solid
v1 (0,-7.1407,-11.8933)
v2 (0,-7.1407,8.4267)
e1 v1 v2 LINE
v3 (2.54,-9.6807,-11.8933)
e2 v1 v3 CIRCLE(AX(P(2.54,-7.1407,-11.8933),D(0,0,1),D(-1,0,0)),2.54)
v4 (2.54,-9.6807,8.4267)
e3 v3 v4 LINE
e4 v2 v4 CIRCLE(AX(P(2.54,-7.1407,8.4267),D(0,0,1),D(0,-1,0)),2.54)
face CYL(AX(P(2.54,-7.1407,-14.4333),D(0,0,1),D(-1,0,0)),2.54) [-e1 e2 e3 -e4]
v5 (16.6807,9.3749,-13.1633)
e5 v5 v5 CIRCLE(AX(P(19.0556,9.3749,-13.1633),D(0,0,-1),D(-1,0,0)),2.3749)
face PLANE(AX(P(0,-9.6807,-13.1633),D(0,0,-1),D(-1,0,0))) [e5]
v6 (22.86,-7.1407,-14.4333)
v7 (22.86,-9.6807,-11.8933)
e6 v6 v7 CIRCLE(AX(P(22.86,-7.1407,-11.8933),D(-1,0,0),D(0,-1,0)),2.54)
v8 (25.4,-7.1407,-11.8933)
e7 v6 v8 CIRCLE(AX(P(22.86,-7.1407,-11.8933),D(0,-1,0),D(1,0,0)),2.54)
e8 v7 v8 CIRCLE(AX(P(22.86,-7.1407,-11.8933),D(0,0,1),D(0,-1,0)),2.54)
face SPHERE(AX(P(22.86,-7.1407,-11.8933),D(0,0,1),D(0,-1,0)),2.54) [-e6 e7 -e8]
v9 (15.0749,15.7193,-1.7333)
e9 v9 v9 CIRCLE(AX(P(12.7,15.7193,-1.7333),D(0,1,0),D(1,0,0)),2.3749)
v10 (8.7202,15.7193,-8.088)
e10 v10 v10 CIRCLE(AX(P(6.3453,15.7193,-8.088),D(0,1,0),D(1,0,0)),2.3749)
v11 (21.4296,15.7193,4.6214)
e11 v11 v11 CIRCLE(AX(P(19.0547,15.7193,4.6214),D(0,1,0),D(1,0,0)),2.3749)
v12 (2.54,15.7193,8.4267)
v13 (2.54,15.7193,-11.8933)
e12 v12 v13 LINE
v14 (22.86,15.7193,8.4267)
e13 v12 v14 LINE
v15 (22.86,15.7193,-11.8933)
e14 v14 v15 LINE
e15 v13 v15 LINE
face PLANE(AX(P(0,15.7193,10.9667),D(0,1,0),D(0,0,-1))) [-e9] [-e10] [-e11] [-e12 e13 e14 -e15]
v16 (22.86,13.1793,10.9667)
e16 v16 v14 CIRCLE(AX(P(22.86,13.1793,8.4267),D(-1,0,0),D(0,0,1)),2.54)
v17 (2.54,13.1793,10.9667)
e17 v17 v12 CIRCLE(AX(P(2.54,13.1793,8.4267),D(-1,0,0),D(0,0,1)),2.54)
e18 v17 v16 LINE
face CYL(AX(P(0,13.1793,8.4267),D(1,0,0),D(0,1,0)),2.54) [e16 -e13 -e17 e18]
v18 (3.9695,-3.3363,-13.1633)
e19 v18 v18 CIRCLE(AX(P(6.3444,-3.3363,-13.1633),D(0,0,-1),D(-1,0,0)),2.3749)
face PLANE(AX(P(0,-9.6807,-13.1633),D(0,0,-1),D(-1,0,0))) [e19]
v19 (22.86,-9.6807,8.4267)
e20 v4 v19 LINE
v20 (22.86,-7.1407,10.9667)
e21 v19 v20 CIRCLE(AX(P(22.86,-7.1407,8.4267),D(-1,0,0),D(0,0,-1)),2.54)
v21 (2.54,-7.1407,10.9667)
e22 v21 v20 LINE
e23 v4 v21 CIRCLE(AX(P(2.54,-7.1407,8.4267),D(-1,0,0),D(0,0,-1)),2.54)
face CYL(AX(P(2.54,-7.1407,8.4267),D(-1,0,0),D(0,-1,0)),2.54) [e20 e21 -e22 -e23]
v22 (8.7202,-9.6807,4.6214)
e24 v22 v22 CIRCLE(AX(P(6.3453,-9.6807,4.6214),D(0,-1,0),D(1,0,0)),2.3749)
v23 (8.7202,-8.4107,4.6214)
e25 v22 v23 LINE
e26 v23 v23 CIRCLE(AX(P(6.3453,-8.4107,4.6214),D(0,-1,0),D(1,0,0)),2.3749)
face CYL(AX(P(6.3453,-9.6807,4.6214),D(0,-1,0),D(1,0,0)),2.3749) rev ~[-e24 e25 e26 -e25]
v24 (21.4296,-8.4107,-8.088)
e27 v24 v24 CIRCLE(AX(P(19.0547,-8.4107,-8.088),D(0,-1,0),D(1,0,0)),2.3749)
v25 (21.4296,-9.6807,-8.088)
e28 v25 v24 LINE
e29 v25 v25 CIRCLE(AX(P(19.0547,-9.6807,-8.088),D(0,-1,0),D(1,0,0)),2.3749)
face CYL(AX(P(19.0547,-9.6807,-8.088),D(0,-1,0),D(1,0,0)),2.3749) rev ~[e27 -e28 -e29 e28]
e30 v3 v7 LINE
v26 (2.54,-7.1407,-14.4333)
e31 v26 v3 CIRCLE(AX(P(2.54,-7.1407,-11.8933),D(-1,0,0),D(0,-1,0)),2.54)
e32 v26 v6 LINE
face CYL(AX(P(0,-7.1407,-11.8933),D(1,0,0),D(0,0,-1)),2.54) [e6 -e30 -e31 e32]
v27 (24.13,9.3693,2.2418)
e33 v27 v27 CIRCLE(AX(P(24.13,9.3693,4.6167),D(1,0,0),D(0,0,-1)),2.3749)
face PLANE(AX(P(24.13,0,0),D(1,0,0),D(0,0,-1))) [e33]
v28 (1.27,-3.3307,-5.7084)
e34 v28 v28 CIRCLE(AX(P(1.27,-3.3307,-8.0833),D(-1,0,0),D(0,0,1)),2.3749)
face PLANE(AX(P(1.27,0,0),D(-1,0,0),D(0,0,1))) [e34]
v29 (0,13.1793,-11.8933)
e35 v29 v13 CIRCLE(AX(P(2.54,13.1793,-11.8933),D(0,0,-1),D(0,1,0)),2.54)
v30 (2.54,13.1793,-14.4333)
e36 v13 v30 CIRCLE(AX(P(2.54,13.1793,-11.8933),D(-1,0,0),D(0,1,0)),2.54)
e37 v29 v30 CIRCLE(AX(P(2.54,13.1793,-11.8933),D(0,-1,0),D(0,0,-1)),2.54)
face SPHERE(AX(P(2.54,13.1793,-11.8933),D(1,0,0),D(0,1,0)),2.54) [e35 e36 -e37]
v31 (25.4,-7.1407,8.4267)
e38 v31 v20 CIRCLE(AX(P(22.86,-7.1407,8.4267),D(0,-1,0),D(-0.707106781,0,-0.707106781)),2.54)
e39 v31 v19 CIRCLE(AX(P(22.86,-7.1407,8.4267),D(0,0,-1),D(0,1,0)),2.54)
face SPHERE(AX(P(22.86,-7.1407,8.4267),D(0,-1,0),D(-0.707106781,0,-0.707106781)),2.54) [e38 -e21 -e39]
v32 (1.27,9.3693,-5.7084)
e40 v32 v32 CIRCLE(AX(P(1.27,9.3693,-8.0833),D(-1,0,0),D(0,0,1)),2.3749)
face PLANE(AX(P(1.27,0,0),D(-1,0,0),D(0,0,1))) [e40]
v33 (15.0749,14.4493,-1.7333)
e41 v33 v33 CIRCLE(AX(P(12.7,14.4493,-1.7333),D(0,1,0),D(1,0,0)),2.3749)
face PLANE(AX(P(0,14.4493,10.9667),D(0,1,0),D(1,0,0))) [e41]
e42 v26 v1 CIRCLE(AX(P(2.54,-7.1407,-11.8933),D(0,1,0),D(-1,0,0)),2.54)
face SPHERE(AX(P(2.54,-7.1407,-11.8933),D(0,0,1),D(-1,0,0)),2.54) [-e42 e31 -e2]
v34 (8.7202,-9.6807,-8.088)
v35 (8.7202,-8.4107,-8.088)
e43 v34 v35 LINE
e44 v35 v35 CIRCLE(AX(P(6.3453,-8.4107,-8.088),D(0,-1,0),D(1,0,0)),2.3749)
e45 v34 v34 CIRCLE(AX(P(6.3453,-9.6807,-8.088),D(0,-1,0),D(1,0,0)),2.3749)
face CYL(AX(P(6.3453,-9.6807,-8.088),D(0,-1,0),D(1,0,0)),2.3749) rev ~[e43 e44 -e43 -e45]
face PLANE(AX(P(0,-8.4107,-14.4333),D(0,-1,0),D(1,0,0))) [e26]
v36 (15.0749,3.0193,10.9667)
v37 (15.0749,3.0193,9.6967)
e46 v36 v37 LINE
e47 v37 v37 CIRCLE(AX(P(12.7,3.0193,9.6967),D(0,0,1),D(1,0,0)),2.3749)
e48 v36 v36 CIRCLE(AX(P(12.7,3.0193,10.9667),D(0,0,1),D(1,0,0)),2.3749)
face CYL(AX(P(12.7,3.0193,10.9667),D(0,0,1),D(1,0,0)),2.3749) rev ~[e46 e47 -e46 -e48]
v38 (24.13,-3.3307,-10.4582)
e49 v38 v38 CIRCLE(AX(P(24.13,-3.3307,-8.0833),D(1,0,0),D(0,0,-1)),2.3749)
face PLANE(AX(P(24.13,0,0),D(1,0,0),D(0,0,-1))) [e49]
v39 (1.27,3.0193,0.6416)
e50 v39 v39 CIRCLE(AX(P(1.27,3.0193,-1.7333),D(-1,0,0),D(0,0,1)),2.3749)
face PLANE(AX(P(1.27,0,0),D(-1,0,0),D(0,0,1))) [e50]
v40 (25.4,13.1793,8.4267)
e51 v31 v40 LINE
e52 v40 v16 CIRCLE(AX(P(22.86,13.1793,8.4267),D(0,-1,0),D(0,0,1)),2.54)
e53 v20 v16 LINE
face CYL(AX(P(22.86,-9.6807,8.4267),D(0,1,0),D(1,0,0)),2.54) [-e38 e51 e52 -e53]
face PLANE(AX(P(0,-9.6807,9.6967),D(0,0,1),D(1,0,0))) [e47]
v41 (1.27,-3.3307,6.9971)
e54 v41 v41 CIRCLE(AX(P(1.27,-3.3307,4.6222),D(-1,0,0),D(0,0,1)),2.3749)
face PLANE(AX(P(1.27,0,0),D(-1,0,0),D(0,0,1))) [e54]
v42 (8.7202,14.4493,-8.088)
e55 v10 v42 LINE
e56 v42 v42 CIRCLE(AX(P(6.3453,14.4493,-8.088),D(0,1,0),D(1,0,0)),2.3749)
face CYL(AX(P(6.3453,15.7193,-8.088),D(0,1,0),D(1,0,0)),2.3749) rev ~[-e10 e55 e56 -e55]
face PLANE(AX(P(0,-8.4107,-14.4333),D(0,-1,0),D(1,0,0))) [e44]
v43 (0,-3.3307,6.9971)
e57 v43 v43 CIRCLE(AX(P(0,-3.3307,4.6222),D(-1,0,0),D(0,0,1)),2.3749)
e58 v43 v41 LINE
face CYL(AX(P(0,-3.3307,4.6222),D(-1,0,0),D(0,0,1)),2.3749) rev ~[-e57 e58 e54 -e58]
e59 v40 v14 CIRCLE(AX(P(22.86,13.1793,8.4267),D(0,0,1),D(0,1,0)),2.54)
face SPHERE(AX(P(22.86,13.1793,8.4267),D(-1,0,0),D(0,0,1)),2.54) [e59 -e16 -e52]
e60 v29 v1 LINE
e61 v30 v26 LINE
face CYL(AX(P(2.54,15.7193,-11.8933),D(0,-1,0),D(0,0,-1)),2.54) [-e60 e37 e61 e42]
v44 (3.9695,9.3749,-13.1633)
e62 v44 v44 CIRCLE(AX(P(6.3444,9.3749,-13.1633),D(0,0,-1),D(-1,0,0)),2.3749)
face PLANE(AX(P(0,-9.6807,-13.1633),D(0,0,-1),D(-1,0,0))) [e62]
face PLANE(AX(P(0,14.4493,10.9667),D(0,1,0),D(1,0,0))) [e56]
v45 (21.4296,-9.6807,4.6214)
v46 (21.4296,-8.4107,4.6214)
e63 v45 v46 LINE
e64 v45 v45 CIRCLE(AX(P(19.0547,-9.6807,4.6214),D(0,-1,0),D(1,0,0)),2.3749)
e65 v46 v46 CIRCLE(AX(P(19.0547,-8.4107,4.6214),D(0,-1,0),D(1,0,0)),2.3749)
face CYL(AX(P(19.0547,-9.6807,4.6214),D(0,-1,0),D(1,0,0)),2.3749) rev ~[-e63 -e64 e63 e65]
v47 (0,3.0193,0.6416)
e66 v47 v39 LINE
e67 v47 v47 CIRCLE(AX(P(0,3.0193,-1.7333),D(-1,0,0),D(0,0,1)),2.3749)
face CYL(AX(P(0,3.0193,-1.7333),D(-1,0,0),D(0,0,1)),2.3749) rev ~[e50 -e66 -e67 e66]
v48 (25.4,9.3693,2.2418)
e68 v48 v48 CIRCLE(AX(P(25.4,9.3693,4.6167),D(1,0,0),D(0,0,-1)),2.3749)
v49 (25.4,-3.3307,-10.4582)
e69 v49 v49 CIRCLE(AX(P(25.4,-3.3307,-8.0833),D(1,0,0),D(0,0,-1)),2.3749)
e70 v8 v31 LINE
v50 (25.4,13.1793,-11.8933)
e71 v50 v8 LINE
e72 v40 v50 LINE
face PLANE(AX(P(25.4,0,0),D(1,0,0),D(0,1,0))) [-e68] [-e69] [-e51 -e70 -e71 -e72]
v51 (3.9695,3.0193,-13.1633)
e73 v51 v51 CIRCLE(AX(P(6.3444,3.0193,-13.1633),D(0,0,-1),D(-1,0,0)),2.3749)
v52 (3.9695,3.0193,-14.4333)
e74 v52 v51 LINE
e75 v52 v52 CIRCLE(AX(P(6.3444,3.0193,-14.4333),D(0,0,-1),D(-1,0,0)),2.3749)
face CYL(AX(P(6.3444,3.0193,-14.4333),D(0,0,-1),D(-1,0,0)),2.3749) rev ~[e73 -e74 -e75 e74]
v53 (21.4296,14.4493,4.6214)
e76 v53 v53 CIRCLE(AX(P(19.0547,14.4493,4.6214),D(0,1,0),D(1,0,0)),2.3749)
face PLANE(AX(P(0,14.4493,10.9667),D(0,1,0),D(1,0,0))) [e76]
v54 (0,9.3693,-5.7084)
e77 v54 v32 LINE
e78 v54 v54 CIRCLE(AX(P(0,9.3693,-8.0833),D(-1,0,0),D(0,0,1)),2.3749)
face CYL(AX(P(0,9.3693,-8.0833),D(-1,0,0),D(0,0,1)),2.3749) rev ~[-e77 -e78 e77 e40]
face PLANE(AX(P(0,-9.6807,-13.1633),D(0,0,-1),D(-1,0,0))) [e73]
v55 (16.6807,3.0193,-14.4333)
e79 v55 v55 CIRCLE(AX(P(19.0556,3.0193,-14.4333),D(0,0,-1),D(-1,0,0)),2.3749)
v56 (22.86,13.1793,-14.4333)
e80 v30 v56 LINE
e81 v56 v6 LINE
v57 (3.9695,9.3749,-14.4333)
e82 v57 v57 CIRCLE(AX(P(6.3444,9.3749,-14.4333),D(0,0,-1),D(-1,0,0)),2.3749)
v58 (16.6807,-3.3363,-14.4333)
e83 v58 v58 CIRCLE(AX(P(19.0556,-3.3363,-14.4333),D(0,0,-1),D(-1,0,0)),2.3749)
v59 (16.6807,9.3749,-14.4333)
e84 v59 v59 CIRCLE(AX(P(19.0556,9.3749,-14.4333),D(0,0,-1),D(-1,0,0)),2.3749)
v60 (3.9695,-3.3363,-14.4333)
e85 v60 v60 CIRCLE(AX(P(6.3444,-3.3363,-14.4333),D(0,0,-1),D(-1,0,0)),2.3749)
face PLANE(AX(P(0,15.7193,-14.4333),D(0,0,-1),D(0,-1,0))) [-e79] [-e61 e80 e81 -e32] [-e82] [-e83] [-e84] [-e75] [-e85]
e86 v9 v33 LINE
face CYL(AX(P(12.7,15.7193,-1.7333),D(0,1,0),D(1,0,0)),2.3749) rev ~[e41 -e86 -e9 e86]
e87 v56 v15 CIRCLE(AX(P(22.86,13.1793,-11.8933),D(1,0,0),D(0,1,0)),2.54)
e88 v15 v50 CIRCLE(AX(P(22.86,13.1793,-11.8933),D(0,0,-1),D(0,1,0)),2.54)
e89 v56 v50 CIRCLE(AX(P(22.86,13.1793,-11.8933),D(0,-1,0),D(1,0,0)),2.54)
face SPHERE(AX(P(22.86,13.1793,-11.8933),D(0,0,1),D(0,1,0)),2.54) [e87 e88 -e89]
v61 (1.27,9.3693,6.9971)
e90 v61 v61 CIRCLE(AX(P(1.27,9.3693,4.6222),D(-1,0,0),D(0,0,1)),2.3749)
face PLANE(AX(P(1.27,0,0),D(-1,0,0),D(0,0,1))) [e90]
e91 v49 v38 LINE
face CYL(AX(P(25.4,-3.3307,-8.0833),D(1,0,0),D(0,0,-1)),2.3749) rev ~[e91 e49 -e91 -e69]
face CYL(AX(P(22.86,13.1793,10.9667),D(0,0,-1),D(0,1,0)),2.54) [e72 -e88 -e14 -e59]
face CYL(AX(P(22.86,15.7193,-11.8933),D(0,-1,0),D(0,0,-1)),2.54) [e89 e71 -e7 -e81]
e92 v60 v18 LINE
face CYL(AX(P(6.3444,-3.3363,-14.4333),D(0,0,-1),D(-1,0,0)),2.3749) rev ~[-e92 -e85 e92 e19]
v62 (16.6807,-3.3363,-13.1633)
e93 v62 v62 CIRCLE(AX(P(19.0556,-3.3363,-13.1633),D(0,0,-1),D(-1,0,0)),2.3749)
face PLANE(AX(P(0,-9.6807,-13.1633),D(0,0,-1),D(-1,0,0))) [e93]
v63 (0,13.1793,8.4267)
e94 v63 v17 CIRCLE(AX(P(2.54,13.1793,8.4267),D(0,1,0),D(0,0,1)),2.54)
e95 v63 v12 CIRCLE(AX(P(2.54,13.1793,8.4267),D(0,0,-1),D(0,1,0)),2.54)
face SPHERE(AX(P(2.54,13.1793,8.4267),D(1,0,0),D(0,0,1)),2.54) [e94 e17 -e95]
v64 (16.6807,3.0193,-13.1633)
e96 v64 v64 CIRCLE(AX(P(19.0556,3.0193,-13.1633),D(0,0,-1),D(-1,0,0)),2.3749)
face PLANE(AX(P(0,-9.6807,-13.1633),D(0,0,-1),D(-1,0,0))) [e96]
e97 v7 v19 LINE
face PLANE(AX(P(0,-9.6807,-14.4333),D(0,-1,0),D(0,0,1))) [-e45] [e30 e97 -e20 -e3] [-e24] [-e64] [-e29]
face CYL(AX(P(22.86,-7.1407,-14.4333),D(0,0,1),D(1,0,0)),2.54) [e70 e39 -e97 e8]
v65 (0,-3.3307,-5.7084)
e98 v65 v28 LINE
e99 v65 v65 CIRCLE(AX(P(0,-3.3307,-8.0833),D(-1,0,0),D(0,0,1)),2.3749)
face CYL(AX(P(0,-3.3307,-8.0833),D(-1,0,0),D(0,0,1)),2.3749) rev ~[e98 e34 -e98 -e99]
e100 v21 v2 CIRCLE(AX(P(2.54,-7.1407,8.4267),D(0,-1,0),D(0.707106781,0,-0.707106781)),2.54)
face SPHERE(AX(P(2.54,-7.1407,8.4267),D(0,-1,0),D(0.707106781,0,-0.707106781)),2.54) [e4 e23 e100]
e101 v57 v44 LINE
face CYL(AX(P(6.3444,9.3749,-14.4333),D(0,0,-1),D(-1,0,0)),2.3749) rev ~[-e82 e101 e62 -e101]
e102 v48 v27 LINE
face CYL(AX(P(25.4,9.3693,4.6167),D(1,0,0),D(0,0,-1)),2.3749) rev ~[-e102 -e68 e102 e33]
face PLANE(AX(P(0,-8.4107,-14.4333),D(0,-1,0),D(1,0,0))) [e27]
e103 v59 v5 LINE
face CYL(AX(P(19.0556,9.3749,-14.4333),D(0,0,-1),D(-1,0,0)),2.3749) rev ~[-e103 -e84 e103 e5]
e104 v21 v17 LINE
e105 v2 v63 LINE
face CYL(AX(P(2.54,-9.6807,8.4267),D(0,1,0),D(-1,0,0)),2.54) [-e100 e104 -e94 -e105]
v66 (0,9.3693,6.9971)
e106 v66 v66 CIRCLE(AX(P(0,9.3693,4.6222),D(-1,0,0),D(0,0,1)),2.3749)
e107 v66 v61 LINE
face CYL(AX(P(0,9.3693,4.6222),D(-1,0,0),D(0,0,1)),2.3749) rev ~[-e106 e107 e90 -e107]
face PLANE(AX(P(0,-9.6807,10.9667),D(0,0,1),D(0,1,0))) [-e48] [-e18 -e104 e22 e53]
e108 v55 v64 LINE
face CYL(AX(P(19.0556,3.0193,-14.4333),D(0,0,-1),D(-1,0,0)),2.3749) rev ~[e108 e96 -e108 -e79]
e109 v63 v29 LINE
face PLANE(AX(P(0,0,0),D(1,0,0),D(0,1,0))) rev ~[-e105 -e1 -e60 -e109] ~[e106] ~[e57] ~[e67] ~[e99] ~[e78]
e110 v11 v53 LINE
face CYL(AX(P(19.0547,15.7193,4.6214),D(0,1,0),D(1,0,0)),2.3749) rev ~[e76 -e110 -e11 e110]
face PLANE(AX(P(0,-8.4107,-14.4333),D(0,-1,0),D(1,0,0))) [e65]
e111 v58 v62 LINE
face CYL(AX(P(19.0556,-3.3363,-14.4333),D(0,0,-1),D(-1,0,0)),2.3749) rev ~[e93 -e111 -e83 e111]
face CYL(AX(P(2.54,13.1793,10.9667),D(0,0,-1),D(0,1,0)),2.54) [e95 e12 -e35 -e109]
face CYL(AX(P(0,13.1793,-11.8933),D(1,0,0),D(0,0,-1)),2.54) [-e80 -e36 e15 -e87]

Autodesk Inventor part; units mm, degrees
ref_plane "YZ Plane" through (0, 0, 0) normal (1, 0, 0) x (0, 1, 0)
ref_plane "XZ Plane" through (0, 0, 0) normal (0, 1, 0) x (-1, 0, 0)
ref_plane "XY Plane" through (0, 0, 0) normal (0, 0, 1) x (1, 0, 0)
sketch "Sketch1" plane through (0, 0, 0) normal (1, 0, 0) x (0, 1, 0)
  line L0 (15.7193, -14.4333) -> (-9.6807, -14.4333)
  line L1 (-9.6807, -14.4333) -> (-9.6807, 10.9667)
  line L2 (-9.6807, 10.9667) -> (15.7193, 10.9667)
  line L3 (15.7193, 10.9667) -> (15.7193, -14.4333)
  line L4 (15.7193, -14.4333) -> (-9.6807, 10.9667) construction
  line L5 (-9.6807, -14.4333) -> (15.7193, 10.9667) construction
  point P0 (0, 0)
  point P1 (3.0193, -1.7333)
  dimension "d0" = 25.4
  dimension "d1" = 25.4
extrude "Extrusion1" add sketch "Sketch1" along normal blind 25.4
sketch "Sketch2" plane through (0, -9.6807, 10.9667) normal (0, 0, 1) x (1, 0, 0)
  circle A0 centre (12.7, 12.7) radius 2.3749
  point P0 (0, 9.6807)
  dimension "d4" = 4.7498
sketch "Sketch3" plane through (0, -9.6807, 10.9667) normal (0, 0, 1) x (1, 0, 0)
  line L0 (0, 0) -> (0, 25.4) projected
  line L1 (0, 0) -> (25.4, 0) projected
  line L2 (25.4, 25.4) -> (25.4, 0) projected
  line L3 (0, 25.4) -> (25.4, 25.4) projected
  point P0 (0, 9.6807)
extrude "Extrusion2" cut sketch "Sketch2" against normal blind 1.27
sketch "Sketch4" plane through (0, 15.7193, 10.9667) normal (0, 1, 0) x (1, 0, 0)
  circle A0 centre (6.3453, 19.0547) radius 2.3749
  circle A1 centre (12.7, 12.7) radius 2.3749
  circle A2 centre (19.0547, 6.3453) radius 2.3749
  point P0 (0, 10.9667)
  dimension "d7" = 4.7498
  dimension "d8" = 4.7498
  dimension "d9" = 4.7498
extrude "Extrusion3" cut sketch "Sketch4" against normal blind 1.27
sketch "Sketch5" plane through (0, -9.6807, -14.4333) normal (0, -1, 0) x (1, 0, 0)
  circle A0 centre (6.3453, 19.0547) radius 2.3749
  circle A1 centre (19.0547, 19.0547) radius 2.3749
  circle A2 centre (6.3453, 6.3453) radius 2.3749
  circle A3 centre (19.0547, 6.3453) radius 2.3749
  point P0 (0, 14.4333)
  dimension "d12" = 4.7498
  dimension "d13" = 4.7498
  dimension "d14" = 4.7498
  dimension "d15" = 4.7498
extrude "Extrusion4" cut sketch "Sketch5" against normal blind 1.27
sketch "Sketch6" plane through (0, -9.6807, -14.4333) normal (0, 0, -1) x (-1, 0, 0)
  circle A0 centre (-19.0556, 19.0556) radius 2.3749
  circle A1 centre (-6.3444, 19.0556) radius 2.3749
  circle A2 centre (-6.3444, 6.3444) radius 2.3749
  circle A3 centre (-19.0556, 6.3444) radius 2.3749
  circle A4 centre (-6.3444, 12.7) radius 2.3749
  circle A5 centre (-19.0556, 12.7) radius 2.3749
  point P0 (0, 9.6807)
  dimension "d18" = 4.7498
  dimension "d19" = 4.7498
  dimension "d20" = 4.7498
  dimension "d21" = 4.7498
  dimension "d22" = 4.7498
  dimension "d23" = 4.7498
extrude "Extrusion5" cut sketch "Sketch6" against normal blind 1.27
sketch "Sketch7" plane through (0, 0, 0) normal (-1, 0, 0) x (0, 0, 1)
  line L0 (-14.4333, 15.7193) -> (-14.4333, -9.6807) projected
  line L1 (-14.4333, -9.6807) -> (10.9667, -9.6807) projected
  line L2 (10.9667, -9.6807) -> (10.9667, 15.7193) projected
  line L3 (10.9667, 15.7193) -> (-14.4333, 15.7193) projected
  circle A0 centre (-8.0833, 9.3693) radius 2.3749
  circle A1 centre (4.6222, 9.3693) radius 2.3749
  circle A2 centre (4.6222, -3.3307) radius 2.3749
  circle A3 centre (-8.0833, -3.3307) radius 2.3749
  circle A4 centre (-1.7333, 3.0193) radius 2.3749
  point P0 (0, 0)
  dimension "d26" = 6.35
  dimension "d27" = 6.35
  dimension "d28" = 6.35
  dimension "d29" = 6.3444
  dimension "d30" = 6.35
  dimension "d31" = 6.3444
  dimension "d32" = 6.35
  dimension "d33" = 6.35
  dimension "d34" = 12.7
  dimension "d35" = 12.7
  dimension "d36" = 4.7498
  dimension "d37" = 4.7498
  dimension "d38" = 4.7498
  dimension "d39" = 4.7498
  dimension "d40" = 4.7498
extrude "Extrusion6" cut sketch "Sketch7" against normal blind 1.27 contours A0 | A1 | A2 | A3 | A4
sketch "Sketch8" plane through (25.4, 0, 0) normal (1, 0, 0) x (0, 0, -1)
  line L0 (14.4333, -9.6807) -> (14.4333, 15.7193) projected
  line L1 (14.4333, 15.7193) -> (-10.9667, 15.7193) projected
  line L2 (-10.9667, 15.7193) -> (-10.9667, -9.6807) projected
  line L3 (-10.9667, -9.6807) -> (14.4333, -9.6807) projected
  circle A0 centre (-4.6167, 9.3693) radius 2.3749
  circle A1 centre (8.0833, -3.3307) radius 2.3749
  point P0 (0, 0)
  dimension "d43" = 4.7498
  dimension "d44" = 4.7498
  dimension "d45" = 6.35
  dimension "d46" = 6.35
  dimension "d47" = 6.35
  dimension "d48" = 6.35
extrude "Extrusion7" cut sketch "Sketch8" against normal blind 1.27 contours A0 | A1
fillet "Fillet1" radius 2.54 11 edges at (12.7, 15.7193, 10.9667) (0, 3.0193, 10.9667) (25.4, 3.0193, 10.9667) (25.4, 15.7193, -1.7333) (12.7, 15.7193, -14.4333) (0, 15.7193, -1.7333) (0, -9.6807, -1.7333) (0, 3.0193, -14.4333) (25.4, -9.6807, -1.7333) (12.7, -9.6807, -14.4333) (25.4, 3.0193, -14.4333)
fillet "Fillet2" radius 2.54 3 edges at (24.6561, -8.9367, 10.2227) (0.7439, -8.9367, 10.2227) (12.7, -9.6807, 10.9667)
properties part number "Goldnsilver die"
